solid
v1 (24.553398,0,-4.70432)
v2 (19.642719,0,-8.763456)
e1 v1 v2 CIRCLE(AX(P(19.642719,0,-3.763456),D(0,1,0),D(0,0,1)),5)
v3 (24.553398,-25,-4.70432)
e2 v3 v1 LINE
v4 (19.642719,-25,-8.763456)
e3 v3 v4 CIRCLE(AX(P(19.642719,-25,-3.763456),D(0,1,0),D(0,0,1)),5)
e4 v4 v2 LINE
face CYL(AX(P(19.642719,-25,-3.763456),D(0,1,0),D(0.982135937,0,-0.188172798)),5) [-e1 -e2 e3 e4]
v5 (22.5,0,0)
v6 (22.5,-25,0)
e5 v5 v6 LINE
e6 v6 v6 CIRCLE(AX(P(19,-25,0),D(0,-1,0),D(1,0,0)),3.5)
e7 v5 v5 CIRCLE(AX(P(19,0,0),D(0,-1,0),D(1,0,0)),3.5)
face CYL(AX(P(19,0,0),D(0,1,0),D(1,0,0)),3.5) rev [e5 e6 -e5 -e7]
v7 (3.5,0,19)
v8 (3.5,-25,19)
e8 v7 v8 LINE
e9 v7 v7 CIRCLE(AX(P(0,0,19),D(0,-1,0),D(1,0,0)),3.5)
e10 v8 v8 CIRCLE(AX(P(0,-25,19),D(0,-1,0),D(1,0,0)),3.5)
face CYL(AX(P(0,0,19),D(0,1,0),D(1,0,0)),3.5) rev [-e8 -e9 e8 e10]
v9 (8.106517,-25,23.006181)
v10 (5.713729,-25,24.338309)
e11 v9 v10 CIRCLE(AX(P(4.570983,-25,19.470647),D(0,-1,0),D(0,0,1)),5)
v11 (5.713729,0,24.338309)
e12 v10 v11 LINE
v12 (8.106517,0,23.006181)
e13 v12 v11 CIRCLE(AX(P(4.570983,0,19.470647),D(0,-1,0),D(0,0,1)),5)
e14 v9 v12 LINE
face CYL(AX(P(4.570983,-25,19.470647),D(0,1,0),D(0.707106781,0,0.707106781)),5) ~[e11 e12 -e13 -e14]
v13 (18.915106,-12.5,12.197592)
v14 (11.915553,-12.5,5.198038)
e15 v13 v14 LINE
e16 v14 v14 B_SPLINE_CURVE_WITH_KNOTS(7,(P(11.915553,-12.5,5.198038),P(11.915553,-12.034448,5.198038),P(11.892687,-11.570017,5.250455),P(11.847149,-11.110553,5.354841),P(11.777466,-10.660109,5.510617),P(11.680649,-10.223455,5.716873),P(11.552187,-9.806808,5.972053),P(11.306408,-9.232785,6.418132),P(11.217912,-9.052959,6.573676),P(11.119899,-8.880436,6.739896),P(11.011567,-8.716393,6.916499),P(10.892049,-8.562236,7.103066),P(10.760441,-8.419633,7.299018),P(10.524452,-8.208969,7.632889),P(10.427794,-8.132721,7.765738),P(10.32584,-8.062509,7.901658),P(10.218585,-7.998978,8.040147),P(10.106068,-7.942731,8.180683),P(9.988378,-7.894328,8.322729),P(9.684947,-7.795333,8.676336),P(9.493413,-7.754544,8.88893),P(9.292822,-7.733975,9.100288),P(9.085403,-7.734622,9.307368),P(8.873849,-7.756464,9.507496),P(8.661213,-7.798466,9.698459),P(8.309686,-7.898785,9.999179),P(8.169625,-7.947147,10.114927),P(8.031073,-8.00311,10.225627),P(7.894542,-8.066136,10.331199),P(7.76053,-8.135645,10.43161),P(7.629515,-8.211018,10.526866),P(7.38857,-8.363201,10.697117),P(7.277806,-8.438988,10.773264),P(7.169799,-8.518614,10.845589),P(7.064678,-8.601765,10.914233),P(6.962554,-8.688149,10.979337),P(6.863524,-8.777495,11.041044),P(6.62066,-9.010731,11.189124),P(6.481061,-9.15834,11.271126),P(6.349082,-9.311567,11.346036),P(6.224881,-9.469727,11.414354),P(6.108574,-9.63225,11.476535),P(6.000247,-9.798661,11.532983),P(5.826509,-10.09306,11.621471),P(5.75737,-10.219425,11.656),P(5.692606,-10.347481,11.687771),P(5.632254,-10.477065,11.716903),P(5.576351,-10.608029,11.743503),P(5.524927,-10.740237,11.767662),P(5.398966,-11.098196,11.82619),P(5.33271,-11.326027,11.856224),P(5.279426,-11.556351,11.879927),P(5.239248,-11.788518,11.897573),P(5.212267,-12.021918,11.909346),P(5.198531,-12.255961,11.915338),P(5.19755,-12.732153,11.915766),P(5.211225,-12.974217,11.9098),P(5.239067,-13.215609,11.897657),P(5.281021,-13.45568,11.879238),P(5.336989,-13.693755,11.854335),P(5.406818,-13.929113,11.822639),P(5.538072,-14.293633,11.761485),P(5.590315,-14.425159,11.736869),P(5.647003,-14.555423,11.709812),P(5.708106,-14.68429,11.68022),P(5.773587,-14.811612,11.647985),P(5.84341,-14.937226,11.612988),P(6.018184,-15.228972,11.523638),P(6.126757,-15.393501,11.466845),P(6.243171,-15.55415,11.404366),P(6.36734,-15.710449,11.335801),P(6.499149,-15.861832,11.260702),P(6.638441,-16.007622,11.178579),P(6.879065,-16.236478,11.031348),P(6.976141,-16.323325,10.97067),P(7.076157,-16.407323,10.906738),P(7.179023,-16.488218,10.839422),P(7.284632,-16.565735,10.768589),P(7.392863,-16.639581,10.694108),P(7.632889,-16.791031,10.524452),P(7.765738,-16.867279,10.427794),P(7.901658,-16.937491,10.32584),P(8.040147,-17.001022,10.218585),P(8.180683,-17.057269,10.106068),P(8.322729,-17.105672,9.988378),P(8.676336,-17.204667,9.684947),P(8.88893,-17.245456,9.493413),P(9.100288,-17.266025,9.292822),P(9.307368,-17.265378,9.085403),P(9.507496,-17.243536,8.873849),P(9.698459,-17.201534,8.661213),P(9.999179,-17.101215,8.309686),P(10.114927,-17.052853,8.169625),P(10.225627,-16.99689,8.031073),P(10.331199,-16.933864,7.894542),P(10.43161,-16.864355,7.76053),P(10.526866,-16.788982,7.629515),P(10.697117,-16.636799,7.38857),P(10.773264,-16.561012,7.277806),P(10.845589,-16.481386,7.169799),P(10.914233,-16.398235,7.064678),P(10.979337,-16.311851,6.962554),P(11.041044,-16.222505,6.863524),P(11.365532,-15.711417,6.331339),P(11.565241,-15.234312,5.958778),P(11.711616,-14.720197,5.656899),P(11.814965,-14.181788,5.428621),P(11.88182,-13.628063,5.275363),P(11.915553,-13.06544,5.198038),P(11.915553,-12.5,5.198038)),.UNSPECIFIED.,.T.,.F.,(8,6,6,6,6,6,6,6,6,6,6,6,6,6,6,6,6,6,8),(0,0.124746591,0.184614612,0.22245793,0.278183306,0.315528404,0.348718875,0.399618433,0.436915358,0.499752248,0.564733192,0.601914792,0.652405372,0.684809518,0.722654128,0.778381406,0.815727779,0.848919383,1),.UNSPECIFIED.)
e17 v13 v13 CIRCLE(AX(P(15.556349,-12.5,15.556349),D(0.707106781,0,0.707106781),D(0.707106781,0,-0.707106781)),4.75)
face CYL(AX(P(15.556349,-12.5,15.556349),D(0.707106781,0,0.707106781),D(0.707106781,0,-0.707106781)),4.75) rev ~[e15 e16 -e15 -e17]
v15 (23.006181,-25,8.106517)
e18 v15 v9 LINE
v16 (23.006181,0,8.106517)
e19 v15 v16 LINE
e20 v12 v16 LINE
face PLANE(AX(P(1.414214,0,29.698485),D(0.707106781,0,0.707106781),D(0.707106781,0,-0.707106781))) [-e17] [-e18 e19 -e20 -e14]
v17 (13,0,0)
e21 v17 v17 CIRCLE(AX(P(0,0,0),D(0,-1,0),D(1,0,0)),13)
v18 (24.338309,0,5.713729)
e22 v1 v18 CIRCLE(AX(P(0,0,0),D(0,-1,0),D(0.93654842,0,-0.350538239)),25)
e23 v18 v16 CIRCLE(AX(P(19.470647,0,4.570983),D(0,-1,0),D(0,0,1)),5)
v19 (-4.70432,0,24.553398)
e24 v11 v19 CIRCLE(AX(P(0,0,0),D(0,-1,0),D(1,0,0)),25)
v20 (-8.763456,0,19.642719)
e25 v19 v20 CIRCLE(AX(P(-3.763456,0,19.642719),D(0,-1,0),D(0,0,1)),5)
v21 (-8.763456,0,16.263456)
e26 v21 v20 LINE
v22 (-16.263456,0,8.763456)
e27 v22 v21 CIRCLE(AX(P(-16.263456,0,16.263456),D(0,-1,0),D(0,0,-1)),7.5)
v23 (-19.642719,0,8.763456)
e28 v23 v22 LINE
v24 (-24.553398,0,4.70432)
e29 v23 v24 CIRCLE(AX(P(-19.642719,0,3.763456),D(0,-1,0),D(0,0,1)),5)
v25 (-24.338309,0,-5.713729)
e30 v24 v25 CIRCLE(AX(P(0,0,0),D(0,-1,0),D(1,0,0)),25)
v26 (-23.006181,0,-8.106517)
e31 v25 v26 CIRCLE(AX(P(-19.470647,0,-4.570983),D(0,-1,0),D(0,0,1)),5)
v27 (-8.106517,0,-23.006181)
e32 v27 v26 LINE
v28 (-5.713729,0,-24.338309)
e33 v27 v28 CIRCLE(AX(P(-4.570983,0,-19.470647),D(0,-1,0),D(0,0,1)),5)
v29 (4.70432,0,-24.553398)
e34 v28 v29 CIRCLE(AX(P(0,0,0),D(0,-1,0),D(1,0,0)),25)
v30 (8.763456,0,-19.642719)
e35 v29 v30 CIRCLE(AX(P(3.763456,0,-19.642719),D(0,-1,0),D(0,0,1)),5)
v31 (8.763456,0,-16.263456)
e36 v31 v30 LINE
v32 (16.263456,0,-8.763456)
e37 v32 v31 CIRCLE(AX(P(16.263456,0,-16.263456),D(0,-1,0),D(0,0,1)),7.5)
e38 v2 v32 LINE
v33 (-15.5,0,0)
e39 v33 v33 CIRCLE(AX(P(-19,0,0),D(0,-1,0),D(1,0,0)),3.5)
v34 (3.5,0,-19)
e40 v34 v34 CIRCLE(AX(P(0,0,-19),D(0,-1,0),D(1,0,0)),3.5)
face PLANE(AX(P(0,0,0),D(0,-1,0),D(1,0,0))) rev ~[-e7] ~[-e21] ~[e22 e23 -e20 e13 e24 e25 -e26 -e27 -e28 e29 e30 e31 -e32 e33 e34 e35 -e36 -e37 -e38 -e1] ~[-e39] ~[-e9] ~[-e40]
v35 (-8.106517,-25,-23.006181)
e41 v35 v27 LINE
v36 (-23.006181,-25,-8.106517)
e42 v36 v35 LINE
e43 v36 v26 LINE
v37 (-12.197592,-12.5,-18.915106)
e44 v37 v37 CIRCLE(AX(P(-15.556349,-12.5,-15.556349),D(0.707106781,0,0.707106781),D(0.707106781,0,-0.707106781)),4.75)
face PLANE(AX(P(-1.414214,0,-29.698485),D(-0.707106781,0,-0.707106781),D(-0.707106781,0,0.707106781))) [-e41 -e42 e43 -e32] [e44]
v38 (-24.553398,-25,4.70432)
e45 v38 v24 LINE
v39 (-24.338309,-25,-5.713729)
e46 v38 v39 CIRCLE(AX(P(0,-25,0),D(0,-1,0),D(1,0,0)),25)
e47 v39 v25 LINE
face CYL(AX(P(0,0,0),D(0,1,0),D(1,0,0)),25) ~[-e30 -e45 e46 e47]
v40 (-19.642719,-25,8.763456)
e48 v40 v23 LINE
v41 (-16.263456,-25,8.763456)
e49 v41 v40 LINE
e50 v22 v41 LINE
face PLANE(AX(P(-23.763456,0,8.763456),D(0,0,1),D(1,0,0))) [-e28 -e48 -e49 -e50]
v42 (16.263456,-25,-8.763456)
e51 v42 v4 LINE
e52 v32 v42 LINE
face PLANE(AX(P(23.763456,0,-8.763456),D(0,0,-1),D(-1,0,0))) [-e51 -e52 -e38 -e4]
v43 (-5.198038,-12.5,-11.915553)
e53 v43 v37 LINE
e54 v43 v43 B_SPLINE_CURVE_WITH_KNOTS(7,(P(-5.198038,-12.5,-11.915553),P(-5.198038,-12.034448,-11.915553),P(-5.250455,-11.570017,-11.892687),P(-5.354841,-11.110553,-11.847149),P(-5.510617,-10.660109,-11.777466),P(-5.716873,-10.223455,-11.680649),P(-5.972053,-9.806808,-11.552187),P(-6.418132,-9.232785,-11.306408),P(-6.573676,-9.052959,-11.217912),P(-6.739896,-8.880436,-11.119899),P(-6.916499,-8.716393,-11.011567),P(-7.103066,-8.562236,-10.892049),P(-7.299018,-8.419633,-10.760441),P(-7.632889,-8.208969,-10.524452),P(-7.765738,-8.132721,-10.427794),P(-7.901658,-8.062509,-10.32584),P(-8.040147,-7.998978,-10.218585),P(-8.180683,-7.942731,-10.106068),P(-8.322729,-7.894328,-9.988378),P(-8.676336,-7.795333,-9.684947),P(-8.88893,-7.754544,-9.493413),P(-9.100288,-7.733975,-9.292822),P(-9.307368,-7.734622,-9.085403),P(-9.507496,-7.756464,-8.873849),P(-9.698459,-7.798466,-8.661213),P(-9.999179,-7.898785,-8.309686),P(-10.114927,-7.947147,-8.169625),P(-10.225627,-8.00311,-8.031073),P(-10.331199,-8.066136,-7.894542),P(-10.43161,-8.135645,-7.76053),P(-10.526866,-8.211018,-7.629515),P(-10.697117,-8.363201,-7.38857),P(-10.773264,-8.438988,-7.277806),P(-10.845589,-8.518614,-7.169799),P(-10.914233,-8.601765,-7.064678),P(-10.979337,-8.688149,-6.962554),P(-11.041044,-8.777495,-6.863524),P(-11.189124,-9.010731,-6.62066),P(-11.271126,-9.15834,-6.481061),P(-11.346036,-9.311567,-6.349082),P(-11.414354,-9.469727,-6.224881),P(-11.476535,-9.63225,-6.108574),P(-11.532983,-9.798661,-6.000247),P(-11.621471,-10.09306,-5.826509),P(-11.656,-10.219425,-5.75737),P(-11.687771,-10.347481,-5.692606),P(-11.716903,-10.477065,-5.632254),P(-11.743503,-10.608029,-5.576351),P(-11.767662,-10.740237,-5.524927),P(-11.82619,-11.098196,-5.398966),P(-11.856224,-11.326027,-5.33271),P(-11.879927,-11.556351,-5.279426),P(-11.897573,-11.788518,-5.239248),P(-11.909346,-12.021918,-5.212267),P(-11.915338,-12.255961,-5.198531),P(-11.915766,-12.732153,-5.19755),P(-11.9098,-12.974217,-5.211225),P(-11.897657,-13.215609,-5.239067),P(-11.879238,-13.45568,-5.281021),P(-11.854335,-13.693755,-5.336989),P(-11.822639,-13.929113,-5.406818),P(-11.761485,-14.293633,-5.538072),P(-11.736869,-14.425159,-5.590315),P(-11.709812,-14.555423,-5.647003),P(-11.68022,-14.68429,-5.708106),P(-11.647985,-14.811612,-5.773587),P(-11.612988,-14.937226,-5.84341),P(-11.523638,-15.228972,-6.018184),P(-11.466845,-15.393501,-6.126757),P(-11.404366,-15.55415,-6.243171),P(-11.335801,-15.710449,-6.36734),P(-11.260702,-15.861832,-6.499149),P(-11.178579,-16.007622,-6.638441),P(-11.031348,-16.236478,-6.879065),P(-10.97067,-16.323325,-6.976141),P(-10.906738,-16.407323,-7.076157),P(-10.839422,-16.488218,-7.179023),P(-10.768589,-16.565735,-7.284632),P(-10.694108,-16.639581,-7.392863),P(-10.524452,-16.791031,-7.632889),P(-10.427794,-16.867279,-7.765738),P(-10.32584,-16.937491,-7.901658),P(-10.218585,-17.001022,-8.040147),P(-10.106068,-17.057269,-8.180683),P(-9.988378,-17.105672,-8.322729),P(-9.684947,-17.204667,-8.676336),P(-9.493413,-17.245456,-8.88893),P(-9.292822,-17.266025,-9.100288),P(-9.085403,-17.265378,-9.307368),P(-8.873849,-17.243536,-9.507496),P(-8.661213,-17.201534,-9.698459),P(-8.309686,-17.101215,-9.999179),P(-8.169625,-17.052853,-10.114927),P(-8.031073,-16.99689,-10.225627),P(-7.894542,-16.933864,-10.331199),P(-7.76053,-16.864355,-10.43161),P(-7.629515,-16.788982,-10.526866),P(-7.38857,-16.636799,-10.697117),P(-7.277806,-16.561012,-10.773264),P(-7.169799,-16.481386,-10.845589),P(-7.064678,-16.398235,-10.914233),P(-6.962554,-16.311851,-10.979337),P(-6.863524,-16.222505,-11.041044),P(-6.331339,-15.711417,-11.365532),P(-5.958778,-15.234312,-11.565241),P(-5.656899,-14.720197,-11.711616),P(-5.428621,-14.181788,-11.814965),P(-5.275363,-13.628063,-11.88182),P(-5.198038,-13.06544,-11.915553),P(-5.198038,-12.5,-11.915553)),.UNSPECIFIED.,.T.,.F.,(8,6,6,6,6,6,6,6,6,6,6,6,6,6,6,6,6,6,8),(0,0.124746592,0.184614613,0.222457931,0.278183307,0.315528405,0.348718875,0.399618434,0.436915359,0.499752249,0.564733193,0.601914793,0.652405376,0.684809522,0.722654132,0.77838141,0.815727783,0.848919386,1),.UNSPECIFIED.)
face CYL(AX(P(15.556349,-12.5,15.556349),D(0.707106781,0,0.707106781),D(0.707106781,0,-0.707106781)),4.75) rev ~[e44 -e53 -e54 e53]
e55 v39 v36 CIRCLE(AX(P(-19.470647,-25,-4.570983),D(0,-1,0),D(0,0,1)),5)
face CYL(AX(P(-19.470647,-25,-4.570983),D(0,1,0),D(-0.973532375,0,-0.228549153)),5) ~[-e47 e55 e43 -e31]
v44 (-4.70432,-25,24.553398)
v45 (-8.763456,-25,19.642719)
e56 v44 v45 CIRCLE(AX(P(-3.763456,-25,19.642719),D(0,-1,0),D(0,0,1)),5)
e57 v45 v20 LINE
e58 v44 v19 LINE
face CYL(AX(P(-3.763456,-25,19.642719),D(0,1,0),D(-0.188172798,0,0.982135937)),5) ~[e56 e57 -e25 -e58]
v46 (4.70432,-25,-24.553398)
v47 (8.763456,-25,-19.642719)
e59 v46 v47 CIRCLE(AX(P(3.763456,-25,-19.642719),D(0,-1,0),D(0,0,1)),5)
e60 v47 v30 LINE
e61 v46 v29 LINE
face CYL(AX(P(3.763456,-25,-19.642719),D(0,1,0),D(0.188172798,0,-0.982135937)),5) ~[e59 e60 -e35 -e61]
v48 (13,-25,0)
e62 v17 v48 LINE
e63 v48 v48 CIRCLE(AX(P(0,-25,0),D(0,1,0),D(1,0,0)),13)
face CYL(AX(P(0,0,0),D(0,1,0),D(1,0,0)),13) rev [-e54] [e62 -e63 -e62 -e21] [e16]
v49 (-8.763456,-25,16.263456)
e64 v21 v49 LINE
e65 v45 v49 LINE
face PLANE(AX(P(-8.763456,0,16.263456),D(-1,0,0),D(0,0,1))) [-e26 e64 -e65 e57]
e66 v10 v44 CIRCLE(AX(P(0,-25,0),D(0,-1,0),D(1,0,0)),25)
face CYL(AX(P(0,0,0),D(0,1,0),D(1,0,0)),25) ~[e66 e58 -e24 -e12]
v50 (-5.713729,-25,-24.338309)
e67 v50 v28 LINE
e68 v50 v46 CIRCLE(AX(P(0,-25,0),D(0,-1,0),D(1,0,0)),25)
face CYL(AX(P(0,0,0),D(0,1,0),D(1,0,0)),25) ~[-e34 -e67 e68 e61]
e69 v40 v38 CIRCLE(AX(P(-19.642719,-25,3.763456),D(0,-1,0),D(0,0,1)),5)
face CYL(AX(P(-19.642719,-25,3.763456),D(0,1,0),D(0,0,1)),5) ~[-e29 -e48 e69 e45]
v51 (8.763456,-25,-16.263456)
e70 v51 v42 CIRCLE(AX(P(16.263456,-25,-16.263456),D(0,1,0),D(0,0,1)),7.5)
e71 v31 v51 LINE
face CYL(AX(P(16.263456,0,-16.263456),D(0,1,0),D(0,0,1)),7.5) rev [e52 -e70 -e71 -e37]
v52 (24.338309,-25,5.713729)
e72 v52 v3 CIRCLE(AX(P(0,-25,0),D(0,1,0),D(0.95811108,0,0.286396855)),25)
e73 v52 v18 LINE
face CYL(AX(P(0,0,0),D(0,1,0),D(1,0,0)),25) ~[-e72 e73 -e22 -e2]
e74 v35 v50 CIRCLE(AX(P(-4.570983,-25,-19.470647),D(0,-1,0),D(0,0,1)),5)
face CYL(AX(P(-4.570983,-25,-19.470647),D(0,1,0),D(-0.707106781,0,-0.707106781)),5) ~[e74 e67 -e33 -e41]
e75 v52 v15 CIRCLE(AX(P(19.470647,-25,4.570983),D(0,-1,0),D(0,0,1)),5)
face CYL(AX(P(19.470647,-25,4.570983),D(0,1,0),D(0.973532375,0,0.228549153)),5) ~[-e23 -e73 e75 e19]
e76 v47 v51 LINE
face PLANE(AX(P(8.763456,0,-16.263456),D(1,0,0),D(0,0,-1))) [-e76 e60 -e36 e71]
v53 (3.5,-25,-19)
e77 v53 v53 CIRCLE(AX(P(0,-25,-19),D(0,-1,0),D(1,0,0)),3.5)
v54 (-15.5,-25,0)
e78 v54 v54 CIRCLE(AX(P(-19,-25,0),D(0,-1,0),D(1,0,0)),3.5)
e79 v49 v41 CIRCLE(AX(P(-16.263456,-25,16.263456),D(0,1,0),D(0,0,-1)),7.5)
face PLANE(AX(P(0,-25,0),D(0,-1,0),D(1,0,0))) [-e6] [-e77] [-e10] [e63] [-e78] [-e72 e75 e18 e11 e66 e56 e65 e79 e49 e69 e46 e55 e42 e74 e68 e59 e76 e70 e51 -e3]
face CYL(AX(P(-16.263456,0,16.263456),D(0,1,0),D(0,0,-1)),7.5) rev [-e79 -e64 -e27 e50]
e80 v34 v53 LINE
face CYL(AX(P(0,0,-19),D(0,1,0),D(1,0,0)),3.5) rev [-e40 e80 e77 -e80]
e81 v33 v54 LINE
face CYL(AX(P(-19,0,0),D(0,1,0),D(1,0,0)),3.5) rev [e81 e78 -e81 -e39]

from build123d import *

# Parameters (mm, degrees)
F0_R     = 25
F0_R_2   = 3.5
F1_DEPTH = 25
F3_DEPTH = 25.001
F4_R     = 5
F5_R     = 13
F6_DEPTH = 25.001
F7_R     = 4.75
F8_DEPTH = 57.3563390593


with BuildPart() as f1:
    # F0 (on Front) → F1 (new body)
    with BuildSketch(Plane.XZ):
        Circle(F0_R)
        with Locations((0, -19)):
            Circle(F0_R_2, mode=Mode.SUBTRACT)
        with Locations((-19, 0)):
            Circle(F0_R_2, mode=Mode.SUBTRACT)
        with Locations((19, 0)):
            Circle(F0_R_2, mode=Mode.SUBTRACT)
        with Locations((0, 19)):
            Circle(F0_R_2, mode=Mode.SUBTRACT)
    extrude(amount=F1_DEPTH)

    # F2 (on Front) → F3 (cut, through all)
    with BuildSketch(Plane.XZ):
        with BuildLine():
            Line((-23.7634559673, 8.7634559673), (-16.2634559673, 8.7634559673))
            ThreePointArc((-16.2634559673, 8.7634559673), (-10.9601551084, 10.9601551084), (-8.7634559673, 16.2634559673))
            Line((-8.7634559673, 16.2634559673), (-8.7634559673, 23.7634559673))
            Line((-8.7634559673, 23.7634559673), (-23.7634559673, 23.7634559673))
            Line((-23.7634559673, 23.7634559673), (-23.7634559673, 8.7634559673))
        make_face()
        Polygon((1.4142135624, 29.6984848098), (29.6984848098, 1.4142135624), (61.3951798296, 33.6381491506), (33.3745288664, 61.6588001138), align=None)
        Polygon((-1.4142135624, -29.6984848098), (-29.6984848098, -1.4142135624), (-61.6588001138, -33.3745288664), (-33.6381491506, -61.3951798296), align=None)
        with BuildLine():
            ThreePointArc((16.2634559673, -8.7634559673), (10.9601551084, -10.9601551084), (8.7634559673, -16.2634559673))
            Line((8.7634559673, -16.2634559673), (8.7634559673, -23.7634559673))
            Line((8.7634559673, -23.7634559673), (23.7634559673, -23.7634559673))
            Line((23.7634559673, -23.7634559673), (23.7634559673, -8.7634559673))
            Line((23.7634559673, -8.7634559673), (16.2634559673, -8.7634559673))
        make_face()
    extrude(amount=F3_DEPTH, mode=Mode.SUBTRACT)

    # F4
    f4_edges = [f1.edges().sort_by_distance(p)[0] for p in [
        (-8.763456, -12.5, 23.413711),
        (-23.413711, -12.5, 8.763456),
        (8.763456, -12.5, -23.413711),
        (23.413711, -12.5, -8.763456),
        (23.952777, -12.5, 7.159921),
        (7.159921, -12.5, 23.952777),
        (-23.952777, -12.5, -7.159921),
        (-7.159921, -12.5, -23.952777),
    ]]
    fillet(f4_edges, radius=F4_R)

    # F5 (on Front) → F6 (cut, through all)
    with BuildSketch(Plane.XZ):
        Circle(F5_R)
    extrude(amount=F6_DEPTH, mode=Mode.SUBTRACT)

    # F7 (on face) → F8 (cut, through all)
    with BuildSketch(Plane(origin=(15.5563491861, 0, 15.5563491861), x_dir=(0.7071067812, 0, -0.7071067812), z_dir=(0.7071067812, 0, 0.7071067812))):
        with Locations((0, -12.5)):
            Circle(F7_R)
    extrude(amount=-F8_DEPTH, mode=Mode.SUBTRACT)


solid = f1.part
